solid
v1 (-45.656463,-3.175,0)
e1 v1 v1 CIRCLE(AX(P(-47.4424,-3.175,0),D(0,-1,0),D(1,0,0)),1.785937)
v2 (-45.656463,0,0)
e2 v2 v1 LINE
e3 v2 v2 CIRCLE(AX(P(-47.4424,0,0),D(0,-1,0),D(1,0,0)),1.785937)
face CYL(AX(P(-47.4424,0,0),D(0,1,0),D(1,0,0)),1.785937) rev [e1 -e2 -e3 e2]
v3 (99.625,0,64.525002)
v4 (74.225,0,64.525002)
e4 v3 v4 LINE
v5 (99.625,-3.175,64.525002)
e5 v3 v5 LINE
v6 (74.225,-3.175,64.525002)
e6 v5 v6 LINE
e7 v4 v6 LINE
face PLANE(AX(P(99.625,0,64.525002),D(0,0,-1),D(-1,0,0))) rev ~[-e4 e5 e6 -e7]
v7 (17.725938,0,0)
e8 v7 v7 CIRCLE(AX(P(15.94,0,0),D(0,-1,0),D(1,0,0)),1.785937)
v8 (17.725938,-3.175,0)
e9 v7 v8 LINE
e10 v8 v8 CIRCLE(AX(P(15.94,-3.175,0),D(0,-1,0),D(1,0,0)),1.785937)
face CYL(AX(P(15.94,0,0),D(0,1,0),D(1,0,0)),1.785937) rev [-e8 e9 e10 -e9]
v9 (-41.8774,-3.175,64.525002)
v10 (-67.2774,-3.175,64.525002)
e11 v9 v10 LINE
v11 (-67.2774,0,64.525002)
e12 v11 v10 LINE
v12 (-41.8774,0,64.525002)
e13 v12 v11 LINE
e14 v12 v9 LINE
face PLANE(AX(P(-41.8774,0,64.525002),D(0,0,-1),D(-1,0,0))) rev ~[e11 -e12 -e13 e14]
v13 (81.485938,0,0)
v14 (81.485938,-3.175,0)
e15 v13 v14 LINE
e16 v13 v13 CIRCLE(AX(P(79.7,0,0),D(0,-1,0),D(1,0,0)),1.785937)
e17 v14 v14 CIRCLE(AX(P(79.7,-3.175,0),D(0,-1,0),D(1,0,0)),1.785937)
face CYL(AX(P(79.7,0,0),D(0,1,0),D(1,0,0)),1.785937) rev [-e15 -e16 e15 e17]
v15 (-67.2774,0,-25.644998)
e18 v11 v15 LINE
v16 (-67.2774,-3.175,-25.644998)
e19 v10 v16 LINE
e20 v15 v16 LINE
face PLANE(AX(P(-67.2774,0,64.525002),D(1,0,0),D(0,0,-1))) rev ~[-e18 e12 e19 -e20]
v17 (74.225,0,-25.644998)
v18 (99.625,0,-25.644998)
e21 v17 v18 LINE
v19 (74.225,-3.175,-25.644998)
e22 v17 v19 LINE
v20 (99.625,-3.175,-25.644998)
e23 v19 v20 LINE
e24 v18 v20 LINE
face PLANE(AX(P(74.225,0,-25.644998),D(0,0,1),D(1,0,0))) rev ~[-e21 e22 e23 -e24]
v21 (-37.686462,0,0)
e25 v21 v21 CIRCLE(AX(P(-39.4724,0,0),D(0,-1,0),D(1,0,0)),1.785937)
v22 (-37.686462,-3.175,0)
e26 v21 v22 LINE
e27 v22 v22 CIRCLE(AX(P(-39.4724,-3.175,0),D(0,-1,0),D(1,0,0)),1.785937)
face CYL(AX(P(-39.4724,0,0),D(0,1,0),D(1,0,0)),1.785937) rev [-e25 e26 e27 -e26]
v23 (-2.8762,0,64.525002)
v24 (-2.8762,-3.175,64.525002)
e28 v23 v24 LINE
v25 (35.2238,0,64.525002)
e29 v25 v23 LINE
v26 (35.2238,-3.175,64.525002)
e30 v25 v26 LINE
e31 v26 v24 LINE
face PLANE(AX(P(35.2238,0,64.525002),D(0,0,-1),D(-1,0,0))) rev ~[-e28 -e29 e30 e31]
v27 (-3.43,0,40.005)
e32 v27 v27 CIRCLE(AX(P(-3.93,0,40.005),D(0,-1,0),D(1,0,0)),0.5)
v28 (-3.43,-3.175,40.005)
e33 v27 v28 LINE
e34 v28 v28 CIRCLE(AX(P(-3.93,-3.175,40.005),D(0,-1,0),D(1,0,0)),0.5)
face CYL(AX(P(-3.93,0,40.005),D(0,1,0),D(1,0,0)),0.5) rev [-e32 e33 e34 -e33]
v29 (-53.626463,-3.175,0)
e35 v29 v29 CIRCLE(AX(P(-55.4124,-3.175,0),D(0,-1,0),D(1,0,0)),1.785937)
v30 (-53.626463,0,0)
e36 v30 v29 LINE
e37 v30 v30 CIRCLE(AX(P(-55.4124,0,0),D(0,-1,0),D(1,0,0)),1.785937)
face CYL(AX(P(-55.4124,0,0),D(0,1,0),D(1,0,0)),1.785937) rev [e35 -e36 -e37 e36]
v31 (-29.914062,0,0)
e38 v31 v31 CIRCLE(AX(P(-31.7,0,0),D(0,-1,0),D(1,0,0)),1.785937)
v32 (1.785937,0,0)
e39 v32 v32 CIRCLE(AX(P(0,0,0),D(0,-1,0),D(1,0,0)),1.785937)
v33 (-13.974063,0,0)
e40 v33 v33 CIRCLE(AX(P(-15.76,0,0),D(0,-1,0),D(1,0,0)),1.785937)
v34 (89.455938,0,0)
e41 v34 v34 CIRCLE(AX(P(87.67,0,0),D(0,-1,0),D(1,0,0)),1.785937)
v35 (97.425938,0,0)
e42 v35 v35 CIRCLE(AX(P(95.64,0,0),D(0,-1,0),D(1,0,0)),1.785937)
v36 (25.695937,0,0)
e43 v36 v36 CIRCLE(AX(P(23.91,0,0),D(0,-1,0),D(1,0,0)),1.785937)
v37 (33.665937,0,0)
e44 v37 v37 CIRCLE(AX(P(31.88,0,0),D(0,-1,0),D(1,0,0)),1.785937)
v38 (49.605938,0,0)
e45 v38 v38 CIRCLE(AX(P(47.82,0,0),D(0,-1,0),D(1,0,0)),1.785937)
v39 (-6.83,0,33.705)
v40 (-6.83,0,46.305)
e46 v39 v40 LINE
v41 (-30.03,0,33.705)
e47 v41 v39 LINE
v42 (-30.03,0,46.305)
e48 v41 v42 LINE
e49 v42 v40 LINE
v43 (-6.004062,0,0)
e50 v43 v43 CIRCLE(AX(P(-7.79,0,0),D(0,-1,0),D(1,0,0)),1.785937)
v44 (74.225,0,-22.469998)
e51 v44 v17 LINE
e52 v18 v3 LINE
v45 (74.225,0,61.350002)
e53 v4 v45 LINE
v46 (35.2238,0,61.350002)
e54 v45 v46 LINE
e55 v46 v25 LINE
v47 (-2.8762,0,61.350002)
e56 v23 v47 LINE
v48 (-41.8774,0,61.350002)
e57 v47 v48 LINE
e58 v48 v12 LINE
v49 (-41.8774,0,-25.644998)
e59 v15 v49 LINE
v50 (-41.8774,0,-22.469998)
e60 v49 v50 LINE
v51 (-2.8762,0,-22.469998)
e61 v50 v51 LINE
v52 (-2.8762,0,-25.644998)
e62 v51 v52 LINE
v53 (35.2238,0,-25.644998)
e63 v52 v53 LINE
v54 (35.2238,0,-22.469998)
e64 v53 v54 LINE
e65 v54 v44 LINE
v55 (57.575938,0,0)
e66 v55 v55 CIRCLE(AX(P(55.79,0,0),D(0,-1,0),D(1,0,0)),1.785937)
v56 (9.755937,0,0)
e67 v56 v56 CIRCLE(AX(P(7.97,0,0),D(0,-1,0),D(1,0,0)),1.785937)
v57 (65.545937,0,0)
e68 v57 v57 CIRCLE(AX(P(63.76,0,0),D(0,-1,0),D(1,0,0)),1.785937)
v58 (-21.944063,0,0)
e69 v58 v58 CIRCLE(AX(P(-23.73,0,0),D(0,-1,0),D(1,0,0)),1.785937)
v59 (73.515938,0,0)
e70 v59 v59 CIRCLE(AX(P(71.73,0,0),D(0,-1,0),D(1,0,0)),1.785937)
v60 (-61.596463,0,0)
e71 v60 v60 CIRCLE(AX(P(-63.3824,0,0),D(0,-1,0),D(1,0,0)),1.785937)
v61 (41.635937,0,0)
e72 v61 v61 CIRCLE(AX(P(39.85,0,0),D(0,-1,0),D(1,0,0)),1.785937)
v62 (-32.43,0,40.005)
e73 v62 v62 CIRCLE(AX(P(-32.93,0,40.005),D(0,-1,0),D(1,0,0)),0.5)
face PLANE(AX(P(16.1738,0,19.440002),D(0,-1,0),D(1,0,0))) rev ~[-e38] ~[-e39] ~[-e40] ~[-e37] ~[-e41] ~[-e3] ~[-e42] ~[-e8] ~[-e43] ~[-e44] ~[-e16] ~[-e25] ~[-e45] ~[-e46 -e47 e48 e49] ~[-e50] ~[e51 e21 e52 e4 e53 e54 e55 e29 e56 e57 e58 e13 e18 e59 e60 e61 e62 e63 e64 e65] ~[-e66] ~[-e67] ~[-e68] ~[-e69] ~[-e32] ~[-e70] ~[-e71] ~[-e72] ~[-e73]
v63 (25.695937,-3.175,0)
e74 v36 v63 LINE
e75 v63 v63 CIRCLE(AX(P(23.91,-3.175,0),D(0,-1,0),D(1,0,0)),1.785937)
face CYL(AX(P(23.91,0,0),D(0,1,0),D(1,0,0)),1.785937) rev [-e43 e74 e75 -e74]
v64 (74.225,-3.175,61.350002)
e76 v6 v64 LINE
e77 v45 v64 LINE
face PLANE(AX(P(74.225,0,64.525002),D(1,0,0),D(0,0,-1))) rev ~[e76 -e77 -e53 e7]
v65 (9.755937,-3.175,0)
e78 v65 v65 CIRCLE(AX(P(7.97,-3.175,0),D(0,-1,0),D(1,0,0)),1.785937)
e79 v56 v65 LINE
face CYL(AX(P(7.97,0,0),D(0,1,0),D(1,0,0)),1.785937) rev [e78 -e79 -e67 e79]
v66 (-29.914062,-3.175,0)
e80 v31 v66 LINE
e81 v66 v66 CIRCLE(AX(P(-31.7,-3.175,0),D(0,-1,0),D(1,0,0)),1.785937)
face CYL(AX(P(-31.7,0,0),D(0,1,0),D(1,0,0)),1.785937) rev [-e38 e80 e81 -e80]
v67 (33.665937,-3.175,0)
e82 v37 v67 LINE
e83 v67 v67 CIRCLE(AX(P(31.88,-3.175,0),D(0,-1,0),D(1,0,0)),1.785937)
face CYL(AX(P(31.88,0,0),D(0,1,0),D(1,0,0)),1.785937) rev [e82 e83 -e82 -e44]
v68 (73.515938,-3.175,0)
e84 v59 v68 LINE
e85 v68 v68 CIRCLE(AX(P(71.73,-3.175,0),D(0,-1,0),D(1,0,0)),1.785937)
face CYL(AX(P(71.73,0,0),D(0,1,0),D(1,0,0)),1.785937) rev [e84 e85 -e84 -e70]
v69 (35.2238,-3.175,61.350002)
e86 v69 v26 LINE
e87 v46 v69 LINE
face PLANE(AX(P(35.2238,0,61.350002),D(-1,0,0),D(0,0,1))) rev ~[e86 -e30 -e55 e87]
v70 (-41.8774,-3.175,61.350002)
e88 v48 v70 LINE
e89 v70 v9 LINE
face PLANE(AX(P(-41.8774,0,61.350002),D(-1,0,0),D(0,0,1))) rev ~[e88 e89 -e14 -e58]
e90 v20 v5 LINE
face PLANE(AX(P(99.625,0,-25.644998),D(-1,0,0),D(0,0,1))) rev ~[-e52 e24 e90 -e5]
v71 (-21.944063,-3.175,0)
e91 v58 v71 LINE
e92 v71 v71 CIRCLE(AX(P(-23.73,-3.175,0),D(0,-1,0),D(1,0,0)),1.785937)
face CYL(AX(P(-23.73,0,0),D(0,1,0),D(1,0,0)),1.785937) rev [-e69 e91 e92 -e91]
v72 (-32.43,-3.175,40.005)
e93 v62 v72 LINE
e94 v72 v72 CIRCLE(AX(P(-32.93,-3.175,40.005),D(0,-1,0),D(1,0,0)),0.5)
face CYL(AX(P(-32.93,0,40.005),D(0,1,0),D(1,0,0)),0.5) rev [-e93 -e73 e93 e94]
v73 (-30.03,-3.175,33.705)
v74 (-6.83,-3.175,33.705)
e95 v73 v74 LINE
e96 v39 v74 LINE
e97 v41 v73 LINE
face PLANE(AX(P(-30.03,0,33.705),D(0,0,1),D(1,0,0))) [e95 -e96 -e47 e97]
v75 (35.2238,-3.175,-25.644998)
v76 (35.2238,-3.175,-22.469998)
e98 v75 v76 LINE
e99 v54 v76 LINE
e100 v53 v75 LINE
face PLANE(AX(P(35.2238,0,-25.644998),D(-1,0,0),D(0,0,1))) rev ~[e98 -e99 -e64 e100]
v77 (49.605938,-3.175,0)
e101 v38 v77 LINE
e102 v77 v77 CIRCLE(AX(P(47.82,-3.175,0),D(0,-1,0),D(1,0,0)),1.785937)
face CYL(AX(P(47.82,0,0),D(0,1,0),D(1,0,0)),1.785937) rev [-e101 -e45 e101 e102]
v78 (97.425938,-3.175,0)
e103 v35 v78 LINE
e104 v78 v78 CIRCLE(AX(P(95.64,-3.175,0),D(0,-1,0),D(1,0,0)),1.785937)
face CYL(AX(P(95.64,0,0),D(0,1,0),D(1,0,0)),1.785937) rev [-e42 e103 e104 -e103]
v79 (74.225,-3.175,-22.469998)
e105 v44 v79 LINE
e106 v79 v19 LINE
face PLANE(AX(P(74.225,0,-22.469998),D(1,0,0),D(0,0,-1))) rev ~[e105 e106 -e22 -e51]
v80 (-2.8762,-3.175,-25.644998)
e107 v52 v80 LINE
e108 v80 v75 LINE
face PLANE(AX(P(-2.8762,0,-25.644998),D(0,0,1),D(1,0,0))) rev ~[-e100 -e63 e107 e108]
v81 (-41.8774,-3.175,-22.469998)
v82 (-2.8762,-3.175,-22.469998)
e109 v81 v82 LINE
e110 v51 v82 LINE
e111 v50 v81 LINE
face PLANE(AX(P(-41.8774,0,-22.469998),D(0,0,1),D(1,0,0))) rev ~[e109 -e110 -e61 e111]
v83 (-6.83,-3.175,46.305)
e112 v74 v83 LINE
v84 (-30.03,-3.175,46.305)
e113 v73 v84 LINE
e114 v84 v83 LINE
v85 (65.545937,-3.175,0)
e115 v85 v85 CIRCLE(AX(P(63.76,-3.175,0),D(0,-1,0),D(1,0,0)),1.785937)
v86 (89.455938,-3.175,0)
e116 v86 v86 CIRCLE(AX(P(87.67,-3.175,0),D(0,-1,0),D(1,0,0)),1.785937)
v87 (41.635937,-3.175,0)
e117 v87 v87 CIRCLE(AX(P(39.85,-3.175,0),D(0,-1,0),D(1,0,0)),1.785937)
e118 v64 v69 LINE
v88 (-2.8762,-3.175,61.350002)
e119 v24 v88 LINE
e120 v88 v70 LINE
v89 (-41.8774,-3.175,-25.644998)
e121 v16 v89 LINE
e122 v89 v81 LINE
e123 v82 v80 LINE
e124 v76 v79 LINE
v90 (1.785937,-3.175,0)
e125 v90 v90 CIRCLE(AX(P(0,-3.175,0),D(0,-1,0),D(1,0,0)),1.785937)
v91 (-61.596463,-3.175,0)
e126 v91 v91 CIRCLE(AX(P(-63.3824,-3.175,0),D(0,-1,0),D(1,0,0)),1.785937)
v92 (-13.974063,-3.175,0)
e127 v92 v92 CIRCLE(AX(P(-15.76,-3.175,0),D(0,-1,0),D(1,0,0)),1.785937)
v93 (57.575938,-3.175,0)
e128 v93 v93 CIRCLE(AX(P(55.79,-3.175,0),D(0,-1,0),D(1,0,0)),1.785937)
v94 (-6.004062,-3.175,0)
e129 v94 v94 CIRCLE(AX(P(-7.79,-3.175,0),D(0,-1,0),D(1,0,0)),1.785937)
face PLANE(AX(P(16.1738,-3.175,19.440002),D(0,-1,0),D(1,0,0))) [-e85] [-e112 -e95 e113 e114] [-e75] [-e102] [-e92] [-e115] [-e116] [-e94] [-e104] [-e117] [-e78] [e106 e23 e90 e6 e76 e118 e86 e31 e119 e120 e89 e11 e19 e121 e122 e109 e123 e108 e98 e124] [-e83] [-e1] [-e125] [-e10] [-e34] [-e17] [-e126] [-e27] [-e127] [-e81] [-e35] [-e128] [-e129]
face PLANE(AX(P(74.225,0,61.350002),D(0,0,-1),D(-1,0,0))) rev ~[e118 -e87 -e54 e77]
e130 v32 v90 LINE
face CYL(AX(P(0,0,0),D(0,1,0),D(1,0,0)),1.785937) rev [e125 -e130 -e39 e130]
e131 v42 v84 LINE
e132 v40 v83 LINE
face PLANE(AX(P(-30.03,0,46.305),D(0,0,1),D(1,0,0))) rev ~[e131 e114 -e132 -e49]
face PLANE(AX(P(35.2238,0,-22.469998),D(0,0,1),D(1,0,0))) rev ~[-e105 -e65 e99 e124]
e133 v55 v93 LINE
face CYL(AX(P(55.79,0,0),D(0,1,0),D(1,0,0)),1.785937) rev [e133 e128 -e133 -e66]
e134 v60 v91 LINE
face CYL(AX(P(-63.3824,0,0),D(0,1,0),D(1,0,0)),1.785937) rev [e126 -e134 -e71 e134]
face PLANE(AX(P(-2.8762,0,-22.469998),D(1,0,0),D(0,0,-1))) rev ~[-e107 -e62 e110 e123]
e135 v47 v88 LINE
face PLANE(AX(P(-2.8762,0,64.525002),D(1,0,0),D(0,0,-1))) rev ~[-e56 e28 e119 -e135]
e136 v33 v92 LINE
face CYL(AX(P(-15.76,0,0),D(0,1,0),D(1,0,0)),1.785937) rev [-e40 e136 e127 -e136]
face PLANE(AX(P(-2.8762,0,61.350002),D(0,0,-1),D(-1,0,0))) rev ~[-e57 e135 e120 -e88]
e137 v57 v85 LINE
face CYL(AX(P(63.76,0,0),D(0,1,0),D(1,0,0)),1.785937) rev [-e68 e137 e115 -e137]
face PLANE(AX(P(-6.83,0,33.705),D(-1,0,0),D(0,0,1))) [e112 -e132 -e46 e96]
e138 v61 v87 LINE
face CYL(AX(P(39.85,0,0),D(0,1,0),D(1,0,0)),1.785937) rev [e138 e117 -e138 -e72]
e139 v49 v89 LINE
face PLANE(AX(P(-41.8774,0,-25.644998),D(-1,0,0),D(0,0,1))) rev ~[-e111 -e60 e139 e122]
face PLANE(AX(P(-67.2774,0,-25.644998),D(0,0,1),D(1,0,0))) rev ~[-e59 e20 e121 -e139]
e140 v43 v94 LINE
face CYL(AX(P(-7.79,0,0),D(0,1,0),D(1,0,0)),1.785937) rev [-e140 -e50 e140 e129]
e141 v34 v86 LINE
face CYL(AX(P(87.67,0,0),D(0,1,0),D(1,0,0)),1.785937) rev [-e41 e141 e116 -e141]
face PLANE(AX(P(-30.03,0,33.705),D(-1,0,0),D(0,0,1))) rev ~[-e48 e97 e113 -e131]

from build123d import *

# Parameters (mm, degrees)
F0_R     = 1.7859375
F0_R_2   = 0.5
F0_W     = 23.2
F0_H     = 12.6
F1_DEPTH = 3.175


# Not quite as in the source:
# - a length typed as a fraction of an inch, garbled in the dataset ("3 / 203.2 mm" for 3/8 in), is restored


with BuildPart() as f1:
    # F0 (on Front) → F1 (new body)
    with BuildSketch(Plane.XZ):
        Polygon((-67.2774, 61.1329712169), (-67.2774, -22.4699976), (-67.2774, -25.6449976), (-41.8774, -25.6449976), (-41.8774, -22.4699976), (-2.8762, -22.4699976), (-2.8762, -25.6449976), (35.2238, -25.6449976), (35.2238, -22.4699976), (74.225, -22.4699976), (74.225, -25.6449976), (99.625, -25.6449976), (99.625, -22.4699976), (99.625, 61.3500024), (99.625, 64.5250024), (74.225, 64.5250024), (74.225, 61.3500024), (35.2238, 61.3500024), (35.2238, 64.5250024), (-2.8762, 64.5250024), (-2.8762, 61.3500024), (-41.8774, 61.3500024), (-41.8774, 64.5250024), (-67.2774, 64.5250024), (-67.2774, 61.3500024), align=None)
        with Locations((-63.3824, 0)):
            Circle(F0_R, mode=Mode.SUBTRACT)
        with Locations((-55.4124, 0)):
            Circle(F0_R, mode=Mode.SUBTRACT)
        with Locations((-47.4424, 0)):
            Circle(F0_R, mode=Mode.SUBTRACT)
        with Locations((-39.4724, 0)):
            Circle(F0_R, mode=Mode.SUBTRACT)
        with Locations((-31.7, 0)):
            Circle(F0_R, mode=Mode.SUBTRACT)
        with Locations((-23.73, 0)):
            Circle(F0_R, mode=Mode.SUBTRACT)
        with Locations((-15.76, 0)):
            Circle(F0_R, mode=Mode.SUBTRACT)
        with Locations((-7.79, 0)):
            Circle(F0_R, mode=Mode.SUBTRACT)
        Circle(F0_R, mode=Mode.SUBTRACT)
        with Locations((7.97, 0)):
            Circle(F0_R, mode=Mode.SUBTRACT)
        with Locations((15.94, 0)):
            Circle(F0_R, mode=Mode.SUBTRACT)
        with Locations((23.91, 0)):
            Circle(F0_R, mode=Mode.SUBTRACT)
        with Locations((31.88, 0)):
            Circle(F0_R, mode=Mode.SUBTRACT)
        with Locations((39.85, 0)):
            Circle(F0_R, mode=Mode.SUBTRACT)
        with Locations((47.82, 0)):
            Circle(F0_R, mode=Mode.SUBTRACT)
        with Locations((55.79, 0)):
            Circle(F0_R, mode=Mode.SUBTRACT)
        with Locations((63.76, 0)):
            Circle(F0_R, mode=Mode.SUBTRACT)
        with Locations((71.73, 0)):
            Circle(F0_R, mode=Mode.SUBTRACT)
        with Locations((79.7, 0)):
            Circle(F0_R, mode=Mode.SUBTRACT)
        with Locations((87.67, 0)):
            Circle(F0_R, mode=Mode.SUBTRACT)
        with Locations((95.64, 0)):
            Circle(F0_R, mode=Mode.SUBTRACT)
        with Locations((-32.93, 40.005)):
            Circle(F0_R_2, mode=Mode.SUBTRACT)
        with Locations((-18.43, 40.005)):
            Rectangle(F0_W, F0_H, mode=Mode.SUBTRACT)
        with Locations((-3.93, 40.005)):
            Circle(F0_R_2, mode=Mode.SUBTRACT)
    extrude(amount=F1_DEPTH)


solid = f1.part
